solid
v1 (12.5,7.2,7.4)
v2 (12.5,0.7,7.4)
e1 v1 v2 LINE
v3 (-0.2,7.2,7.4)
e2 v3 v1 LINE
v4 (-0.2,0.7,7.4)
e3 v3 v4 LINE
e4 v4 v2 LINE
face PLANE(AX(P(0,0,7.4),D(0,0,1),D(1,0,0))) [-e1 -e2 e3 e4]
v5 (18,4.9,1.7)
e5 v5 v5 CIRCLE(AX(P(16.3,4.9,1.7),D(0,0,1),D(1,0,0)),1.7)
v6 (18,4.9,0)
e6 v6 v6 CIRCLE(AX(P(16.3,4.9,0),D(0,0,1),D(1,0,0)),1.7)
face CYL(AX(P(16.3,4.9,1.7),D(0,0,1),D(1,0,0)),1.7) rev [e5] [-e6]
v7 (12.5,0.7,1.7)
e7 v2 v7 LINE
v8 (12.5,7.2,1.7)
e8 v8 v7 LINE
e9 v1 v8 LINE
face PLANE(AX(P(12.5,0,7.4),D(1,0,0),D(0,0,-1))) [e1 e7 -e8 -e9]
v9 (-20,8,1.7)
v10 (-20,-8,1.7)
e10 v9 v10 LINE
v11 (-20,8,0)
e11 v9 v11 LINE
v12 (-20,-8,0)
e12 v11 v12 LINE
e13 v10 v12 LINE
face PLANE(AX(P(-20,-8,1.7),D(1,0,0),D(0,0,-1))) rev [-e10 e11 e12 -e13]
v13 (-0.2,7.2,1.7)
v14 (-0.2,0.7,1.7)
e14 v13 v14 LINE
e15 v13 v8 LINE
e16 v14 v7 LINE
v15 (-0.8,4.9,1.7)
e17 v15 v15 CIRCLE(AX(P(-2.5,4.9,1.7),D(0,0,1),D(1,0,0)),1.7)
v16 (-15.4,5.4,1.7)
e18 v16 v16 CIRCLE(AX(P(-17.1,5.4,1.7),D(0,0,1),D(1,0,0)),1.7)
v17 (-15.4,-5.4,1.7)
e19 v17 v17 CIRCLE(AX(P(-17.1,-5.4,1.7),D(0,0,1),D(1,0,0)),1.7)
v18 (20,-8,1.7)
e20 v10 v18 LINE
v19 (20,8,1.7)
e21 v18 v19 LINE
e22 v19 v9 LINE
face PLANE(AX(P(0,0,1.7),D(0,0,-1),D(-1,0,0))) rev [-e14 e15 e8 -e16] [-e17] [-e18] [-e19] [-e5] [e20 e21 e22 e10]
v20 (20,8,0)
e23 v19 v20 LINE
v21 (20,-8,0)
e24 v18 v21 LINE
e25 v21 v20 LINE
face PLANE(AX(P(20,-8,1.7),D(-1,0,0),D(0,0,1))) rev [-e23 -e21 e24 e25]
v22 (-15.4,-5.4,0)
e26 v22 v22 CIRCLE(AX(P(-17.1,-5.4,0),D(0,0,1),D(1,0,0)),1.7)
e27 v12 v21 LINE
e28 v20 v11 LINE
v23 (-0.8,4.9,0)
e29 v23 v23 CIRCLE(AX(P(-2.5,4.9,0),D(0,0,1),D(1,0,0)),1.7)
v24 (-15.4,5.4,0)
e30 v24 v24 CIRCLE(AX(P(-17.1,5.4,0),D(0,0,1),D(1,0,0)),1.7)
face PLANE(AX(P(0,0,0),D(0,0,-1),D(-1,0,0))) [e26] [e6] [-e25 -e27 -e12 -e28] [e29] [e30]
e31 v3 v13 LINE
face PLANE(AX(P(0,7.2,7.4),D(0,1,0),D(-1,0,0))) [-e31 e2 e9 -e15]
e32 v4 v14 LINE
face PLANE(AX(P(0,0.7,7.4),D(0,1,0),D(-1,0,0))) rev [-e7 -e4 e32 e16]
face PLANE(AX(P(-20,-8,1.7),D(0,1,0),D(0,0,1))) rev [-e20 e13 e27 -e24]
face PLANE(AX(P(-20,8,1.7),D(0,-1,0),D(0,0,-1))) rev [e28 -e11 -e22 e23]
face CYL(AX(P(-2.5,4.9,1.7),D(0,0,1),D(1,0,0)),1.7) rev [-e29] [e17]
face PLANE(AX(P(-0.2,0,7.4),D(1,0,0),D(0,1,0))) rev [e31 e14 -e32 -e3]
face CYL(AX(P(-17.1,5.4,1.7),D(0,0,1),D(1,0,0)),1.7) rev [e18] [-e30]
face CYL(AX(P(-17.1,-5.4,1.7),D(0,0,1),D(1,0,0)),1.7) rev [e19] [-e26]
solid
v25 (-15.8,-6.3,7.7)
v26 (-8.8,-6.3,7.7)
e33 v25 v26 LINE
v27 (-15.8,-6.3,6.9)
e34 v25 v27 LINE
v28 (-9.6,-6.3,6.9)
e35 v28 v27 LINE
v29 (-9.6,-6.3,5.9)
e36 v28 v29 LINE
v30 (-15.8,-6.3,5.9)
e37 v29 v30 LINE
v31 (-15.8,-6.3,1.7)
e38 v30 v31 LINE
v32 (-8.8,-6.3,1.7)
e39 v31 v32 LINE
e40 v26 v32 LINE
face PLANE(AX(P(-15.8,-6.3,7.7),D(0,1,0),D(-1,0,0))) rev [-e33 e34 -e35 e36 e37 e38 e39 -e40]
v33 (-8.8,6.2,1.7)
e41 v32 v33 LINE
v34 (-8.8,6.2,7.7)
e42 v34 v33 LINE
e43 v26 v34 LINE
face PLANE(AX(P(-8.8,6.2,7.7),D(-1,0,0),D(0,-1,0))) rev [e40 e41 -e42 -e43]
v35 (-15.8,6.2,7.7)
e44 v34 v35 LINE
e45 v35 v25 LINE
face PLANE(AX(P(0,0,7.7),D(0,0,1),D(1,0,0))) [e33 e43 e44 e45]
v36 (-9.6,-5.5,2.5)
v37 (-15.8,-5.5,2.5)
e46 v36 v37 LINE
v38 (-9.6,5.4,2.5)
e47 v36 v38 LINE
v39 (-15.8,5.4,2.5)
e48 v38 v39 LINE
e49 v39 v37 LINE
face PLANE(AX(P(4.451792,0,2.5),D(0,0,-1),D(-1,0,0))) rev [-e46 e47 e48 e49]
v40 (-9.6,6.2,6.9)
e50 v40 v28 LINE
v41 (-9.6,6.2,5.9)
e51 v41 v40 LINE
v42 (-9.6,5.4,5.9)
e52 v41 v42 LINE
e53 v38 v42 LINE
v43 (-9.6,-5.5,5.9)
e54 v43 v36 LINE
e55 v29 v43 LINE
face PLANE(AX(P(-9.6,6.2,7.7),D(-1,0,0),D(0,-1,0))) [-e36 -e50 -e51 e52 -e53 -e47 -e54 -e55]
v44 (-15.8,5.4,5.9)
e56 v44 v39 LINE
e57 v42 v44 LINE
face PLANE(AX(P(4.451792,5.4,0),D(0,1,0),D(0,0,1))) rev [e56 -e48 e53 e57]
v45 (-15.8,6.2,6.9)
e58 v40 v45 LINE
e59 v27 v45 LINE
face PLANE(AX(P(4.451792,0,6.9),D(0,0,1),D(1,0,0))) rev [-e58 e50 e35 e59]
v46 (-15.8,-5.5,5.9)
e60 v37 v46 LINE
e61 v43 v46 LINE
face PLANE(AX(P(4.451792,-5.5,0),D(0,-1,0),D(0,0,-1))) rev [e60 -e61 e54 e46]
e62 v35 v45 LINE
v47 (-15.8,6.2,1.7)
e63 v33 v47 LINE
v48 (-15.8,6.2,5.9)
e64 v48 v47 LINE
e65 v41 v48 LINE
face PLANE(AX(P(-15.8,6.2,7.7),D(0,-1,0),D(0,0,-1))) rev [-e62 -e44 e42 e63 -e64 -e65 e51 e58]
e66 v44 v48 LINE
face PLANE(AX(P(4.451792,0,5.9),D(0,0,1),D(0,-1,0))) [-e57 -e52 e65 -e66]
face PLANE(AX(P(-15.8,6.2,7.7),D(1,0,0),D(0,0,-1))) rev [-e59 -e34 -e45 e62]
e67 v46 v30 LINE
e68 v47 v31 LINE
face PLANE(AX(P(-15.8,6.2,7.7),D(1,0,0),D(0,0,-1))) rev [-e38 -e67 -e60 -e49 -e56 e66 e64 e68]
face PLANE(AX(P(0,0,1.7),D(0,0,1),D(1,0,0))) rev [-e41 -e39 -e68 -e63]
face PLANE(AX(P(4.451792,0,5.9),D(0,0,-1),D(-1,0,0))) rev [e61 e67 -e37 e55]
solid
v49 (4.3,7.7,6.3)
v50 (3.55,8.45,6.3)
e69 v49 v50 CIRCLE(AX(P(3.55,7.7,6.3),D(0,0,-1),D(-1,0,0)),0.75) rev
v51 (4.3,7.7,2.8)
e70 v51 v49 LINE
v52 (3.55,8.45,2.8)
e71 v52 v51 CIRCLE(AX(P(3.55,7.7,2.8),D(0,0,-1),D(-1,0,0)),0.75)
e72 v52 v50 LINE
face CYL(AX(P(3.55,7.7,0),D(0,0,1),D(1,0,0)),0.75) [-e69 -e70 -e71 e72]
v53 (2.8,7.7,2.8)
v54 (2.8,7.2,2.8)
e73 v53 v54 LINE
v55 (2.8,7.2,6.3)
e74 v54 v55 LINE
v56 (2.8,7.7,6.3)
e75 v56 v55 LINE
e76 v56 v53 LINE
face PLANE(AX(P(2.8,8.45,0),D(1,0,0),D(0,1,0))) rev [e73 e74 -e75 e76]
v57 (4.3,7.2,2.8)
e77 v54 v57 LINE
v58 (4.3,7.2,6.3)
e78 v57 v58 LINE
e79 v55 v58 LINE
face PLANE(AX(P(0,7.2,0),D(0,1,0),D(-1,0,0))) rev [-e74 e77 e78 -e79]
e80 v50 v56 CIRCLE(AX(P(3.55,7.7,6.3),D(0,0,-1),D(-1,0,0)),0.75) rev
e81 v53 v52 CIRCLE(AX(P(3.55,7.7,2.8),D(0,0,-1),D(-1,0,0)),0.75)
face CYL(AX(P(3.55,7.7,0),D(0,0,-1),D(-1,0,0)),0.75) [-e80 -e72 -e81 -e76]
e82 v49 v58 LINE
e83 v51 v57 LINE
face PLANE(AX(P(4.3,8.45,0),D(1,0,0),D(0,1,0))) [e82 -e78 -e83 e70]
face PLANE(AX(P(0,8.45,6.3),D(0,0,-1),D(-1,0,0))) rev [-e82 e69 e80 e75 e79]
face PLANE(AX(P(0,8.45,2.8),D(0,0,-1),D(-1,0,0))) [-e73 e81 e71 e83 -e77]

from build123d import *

# Parameters (mm, degrees)
SKETCH1_W            = 40
SKETCH1_H            = 16
BOSS_EXTRUDE1_DEPTH  = 1.7
M3_CLEARANCE_HOLE1_D = 3.4
SKETCH5_W            = 12.7
SKETCH5_H            = 6.5
BOSS_EXTRUDE2_DEPTH  = 5.7
SKETCH6_W            = 1.5
SKETCH6_H            = 3.5
BOSS_EXTRUDE3_DEPTH  = 1.25
FILLET1_R            = 0.75
SKETCH7_W            = 7
SKETCH7_H            = 12.5
BOSS_EXTRUDE4_DEPTH  = 6
CUT_EXTRUDE1_DEPTH   = 6.2


with BuildPart() as part:
    # Sketch1 → Boss-Extrude1 (new body)
    with BuildSketch(Plane.XY):
        Rectangle(SKETCH1_W, SKETCH1_H)
    extrude(amount=BOSS_EXTRUDE1_DEPTH)

    # M3 Clearance Hole1 (through all)
    with Locations(Plane.XY.offset(1.7)):
        with Locations((-17.1, -5.4), (-2.5, 4.9), (16.3, 4.9), (-17.1, 5.4)):
            Hole(M3_CLEARANCE_HOLE1_D / 2)

    # Sketch5 → Boss-Extrude2 (add)
    with BuildSketch(Plane.XY.offset(1.7)):
        with Locations((6.15, 3.95)):
            Rectangle(SKETCH5_W, SKETCH5_H)
    extrude(amount=BOSS_EXTRUDE2_DEPTH)


with BuildPart() as body_2:
    # Sketch6 → Boss-Extrude3 (new body)
    with BuildSketch(Plane(origin=(0, 7.2, 0), x_dir=(1, 0, 0), z_dir=(0, 1, 0))):
        with Locations((3.55, -4.55)):
            Rectangle(SKETCH6_W, SKETCH6_H)
    extrude(amount=BOSS_EXTRUDE3_DEPTH)

    # Fillet1
    fillet1_edges = [body_2.edges().sort_by_distance(p)[0] for p in [
        (4.3, 8.45, 4.55),
        (2.8, 8.45, 4.55),
    ]]
    fillet(fillet1_edges, radius=FILLET1_R - 0.0001)  # a hair under: the kernel refuses the full size


with BuildPart() as body_3:
    # Sketch7 → Boss-Extrude4 (new body)
    with BuildSketch(Plane.XY.offset(1.7)):
        with Locations((-12.3, -0.05)):
            Rectangle(SKETCH7_W, SKETCH7_H)
    extrude(amount=BOSS_EXTRUDE4_DEPTH)

    # Sketch8 → Cut-Extrude1 (cut)
    with BuildSketch(Plane.ZY.offset(15.8)):
        Polygon((6.9, 6.2), (5.9, 6.2), (5.9, 5.4), (2.5, 5.4), (2.5, -5.5), (5.9, -5.5), (5.9, -6.3), (6.9, -6.3), align=None)
    extrude(amount=-CUT_EXTRUDE1_DEPTH, mode=Mode.SUBTRACT)


solid = Compound([part.part, body_2.part, body_3.part])
